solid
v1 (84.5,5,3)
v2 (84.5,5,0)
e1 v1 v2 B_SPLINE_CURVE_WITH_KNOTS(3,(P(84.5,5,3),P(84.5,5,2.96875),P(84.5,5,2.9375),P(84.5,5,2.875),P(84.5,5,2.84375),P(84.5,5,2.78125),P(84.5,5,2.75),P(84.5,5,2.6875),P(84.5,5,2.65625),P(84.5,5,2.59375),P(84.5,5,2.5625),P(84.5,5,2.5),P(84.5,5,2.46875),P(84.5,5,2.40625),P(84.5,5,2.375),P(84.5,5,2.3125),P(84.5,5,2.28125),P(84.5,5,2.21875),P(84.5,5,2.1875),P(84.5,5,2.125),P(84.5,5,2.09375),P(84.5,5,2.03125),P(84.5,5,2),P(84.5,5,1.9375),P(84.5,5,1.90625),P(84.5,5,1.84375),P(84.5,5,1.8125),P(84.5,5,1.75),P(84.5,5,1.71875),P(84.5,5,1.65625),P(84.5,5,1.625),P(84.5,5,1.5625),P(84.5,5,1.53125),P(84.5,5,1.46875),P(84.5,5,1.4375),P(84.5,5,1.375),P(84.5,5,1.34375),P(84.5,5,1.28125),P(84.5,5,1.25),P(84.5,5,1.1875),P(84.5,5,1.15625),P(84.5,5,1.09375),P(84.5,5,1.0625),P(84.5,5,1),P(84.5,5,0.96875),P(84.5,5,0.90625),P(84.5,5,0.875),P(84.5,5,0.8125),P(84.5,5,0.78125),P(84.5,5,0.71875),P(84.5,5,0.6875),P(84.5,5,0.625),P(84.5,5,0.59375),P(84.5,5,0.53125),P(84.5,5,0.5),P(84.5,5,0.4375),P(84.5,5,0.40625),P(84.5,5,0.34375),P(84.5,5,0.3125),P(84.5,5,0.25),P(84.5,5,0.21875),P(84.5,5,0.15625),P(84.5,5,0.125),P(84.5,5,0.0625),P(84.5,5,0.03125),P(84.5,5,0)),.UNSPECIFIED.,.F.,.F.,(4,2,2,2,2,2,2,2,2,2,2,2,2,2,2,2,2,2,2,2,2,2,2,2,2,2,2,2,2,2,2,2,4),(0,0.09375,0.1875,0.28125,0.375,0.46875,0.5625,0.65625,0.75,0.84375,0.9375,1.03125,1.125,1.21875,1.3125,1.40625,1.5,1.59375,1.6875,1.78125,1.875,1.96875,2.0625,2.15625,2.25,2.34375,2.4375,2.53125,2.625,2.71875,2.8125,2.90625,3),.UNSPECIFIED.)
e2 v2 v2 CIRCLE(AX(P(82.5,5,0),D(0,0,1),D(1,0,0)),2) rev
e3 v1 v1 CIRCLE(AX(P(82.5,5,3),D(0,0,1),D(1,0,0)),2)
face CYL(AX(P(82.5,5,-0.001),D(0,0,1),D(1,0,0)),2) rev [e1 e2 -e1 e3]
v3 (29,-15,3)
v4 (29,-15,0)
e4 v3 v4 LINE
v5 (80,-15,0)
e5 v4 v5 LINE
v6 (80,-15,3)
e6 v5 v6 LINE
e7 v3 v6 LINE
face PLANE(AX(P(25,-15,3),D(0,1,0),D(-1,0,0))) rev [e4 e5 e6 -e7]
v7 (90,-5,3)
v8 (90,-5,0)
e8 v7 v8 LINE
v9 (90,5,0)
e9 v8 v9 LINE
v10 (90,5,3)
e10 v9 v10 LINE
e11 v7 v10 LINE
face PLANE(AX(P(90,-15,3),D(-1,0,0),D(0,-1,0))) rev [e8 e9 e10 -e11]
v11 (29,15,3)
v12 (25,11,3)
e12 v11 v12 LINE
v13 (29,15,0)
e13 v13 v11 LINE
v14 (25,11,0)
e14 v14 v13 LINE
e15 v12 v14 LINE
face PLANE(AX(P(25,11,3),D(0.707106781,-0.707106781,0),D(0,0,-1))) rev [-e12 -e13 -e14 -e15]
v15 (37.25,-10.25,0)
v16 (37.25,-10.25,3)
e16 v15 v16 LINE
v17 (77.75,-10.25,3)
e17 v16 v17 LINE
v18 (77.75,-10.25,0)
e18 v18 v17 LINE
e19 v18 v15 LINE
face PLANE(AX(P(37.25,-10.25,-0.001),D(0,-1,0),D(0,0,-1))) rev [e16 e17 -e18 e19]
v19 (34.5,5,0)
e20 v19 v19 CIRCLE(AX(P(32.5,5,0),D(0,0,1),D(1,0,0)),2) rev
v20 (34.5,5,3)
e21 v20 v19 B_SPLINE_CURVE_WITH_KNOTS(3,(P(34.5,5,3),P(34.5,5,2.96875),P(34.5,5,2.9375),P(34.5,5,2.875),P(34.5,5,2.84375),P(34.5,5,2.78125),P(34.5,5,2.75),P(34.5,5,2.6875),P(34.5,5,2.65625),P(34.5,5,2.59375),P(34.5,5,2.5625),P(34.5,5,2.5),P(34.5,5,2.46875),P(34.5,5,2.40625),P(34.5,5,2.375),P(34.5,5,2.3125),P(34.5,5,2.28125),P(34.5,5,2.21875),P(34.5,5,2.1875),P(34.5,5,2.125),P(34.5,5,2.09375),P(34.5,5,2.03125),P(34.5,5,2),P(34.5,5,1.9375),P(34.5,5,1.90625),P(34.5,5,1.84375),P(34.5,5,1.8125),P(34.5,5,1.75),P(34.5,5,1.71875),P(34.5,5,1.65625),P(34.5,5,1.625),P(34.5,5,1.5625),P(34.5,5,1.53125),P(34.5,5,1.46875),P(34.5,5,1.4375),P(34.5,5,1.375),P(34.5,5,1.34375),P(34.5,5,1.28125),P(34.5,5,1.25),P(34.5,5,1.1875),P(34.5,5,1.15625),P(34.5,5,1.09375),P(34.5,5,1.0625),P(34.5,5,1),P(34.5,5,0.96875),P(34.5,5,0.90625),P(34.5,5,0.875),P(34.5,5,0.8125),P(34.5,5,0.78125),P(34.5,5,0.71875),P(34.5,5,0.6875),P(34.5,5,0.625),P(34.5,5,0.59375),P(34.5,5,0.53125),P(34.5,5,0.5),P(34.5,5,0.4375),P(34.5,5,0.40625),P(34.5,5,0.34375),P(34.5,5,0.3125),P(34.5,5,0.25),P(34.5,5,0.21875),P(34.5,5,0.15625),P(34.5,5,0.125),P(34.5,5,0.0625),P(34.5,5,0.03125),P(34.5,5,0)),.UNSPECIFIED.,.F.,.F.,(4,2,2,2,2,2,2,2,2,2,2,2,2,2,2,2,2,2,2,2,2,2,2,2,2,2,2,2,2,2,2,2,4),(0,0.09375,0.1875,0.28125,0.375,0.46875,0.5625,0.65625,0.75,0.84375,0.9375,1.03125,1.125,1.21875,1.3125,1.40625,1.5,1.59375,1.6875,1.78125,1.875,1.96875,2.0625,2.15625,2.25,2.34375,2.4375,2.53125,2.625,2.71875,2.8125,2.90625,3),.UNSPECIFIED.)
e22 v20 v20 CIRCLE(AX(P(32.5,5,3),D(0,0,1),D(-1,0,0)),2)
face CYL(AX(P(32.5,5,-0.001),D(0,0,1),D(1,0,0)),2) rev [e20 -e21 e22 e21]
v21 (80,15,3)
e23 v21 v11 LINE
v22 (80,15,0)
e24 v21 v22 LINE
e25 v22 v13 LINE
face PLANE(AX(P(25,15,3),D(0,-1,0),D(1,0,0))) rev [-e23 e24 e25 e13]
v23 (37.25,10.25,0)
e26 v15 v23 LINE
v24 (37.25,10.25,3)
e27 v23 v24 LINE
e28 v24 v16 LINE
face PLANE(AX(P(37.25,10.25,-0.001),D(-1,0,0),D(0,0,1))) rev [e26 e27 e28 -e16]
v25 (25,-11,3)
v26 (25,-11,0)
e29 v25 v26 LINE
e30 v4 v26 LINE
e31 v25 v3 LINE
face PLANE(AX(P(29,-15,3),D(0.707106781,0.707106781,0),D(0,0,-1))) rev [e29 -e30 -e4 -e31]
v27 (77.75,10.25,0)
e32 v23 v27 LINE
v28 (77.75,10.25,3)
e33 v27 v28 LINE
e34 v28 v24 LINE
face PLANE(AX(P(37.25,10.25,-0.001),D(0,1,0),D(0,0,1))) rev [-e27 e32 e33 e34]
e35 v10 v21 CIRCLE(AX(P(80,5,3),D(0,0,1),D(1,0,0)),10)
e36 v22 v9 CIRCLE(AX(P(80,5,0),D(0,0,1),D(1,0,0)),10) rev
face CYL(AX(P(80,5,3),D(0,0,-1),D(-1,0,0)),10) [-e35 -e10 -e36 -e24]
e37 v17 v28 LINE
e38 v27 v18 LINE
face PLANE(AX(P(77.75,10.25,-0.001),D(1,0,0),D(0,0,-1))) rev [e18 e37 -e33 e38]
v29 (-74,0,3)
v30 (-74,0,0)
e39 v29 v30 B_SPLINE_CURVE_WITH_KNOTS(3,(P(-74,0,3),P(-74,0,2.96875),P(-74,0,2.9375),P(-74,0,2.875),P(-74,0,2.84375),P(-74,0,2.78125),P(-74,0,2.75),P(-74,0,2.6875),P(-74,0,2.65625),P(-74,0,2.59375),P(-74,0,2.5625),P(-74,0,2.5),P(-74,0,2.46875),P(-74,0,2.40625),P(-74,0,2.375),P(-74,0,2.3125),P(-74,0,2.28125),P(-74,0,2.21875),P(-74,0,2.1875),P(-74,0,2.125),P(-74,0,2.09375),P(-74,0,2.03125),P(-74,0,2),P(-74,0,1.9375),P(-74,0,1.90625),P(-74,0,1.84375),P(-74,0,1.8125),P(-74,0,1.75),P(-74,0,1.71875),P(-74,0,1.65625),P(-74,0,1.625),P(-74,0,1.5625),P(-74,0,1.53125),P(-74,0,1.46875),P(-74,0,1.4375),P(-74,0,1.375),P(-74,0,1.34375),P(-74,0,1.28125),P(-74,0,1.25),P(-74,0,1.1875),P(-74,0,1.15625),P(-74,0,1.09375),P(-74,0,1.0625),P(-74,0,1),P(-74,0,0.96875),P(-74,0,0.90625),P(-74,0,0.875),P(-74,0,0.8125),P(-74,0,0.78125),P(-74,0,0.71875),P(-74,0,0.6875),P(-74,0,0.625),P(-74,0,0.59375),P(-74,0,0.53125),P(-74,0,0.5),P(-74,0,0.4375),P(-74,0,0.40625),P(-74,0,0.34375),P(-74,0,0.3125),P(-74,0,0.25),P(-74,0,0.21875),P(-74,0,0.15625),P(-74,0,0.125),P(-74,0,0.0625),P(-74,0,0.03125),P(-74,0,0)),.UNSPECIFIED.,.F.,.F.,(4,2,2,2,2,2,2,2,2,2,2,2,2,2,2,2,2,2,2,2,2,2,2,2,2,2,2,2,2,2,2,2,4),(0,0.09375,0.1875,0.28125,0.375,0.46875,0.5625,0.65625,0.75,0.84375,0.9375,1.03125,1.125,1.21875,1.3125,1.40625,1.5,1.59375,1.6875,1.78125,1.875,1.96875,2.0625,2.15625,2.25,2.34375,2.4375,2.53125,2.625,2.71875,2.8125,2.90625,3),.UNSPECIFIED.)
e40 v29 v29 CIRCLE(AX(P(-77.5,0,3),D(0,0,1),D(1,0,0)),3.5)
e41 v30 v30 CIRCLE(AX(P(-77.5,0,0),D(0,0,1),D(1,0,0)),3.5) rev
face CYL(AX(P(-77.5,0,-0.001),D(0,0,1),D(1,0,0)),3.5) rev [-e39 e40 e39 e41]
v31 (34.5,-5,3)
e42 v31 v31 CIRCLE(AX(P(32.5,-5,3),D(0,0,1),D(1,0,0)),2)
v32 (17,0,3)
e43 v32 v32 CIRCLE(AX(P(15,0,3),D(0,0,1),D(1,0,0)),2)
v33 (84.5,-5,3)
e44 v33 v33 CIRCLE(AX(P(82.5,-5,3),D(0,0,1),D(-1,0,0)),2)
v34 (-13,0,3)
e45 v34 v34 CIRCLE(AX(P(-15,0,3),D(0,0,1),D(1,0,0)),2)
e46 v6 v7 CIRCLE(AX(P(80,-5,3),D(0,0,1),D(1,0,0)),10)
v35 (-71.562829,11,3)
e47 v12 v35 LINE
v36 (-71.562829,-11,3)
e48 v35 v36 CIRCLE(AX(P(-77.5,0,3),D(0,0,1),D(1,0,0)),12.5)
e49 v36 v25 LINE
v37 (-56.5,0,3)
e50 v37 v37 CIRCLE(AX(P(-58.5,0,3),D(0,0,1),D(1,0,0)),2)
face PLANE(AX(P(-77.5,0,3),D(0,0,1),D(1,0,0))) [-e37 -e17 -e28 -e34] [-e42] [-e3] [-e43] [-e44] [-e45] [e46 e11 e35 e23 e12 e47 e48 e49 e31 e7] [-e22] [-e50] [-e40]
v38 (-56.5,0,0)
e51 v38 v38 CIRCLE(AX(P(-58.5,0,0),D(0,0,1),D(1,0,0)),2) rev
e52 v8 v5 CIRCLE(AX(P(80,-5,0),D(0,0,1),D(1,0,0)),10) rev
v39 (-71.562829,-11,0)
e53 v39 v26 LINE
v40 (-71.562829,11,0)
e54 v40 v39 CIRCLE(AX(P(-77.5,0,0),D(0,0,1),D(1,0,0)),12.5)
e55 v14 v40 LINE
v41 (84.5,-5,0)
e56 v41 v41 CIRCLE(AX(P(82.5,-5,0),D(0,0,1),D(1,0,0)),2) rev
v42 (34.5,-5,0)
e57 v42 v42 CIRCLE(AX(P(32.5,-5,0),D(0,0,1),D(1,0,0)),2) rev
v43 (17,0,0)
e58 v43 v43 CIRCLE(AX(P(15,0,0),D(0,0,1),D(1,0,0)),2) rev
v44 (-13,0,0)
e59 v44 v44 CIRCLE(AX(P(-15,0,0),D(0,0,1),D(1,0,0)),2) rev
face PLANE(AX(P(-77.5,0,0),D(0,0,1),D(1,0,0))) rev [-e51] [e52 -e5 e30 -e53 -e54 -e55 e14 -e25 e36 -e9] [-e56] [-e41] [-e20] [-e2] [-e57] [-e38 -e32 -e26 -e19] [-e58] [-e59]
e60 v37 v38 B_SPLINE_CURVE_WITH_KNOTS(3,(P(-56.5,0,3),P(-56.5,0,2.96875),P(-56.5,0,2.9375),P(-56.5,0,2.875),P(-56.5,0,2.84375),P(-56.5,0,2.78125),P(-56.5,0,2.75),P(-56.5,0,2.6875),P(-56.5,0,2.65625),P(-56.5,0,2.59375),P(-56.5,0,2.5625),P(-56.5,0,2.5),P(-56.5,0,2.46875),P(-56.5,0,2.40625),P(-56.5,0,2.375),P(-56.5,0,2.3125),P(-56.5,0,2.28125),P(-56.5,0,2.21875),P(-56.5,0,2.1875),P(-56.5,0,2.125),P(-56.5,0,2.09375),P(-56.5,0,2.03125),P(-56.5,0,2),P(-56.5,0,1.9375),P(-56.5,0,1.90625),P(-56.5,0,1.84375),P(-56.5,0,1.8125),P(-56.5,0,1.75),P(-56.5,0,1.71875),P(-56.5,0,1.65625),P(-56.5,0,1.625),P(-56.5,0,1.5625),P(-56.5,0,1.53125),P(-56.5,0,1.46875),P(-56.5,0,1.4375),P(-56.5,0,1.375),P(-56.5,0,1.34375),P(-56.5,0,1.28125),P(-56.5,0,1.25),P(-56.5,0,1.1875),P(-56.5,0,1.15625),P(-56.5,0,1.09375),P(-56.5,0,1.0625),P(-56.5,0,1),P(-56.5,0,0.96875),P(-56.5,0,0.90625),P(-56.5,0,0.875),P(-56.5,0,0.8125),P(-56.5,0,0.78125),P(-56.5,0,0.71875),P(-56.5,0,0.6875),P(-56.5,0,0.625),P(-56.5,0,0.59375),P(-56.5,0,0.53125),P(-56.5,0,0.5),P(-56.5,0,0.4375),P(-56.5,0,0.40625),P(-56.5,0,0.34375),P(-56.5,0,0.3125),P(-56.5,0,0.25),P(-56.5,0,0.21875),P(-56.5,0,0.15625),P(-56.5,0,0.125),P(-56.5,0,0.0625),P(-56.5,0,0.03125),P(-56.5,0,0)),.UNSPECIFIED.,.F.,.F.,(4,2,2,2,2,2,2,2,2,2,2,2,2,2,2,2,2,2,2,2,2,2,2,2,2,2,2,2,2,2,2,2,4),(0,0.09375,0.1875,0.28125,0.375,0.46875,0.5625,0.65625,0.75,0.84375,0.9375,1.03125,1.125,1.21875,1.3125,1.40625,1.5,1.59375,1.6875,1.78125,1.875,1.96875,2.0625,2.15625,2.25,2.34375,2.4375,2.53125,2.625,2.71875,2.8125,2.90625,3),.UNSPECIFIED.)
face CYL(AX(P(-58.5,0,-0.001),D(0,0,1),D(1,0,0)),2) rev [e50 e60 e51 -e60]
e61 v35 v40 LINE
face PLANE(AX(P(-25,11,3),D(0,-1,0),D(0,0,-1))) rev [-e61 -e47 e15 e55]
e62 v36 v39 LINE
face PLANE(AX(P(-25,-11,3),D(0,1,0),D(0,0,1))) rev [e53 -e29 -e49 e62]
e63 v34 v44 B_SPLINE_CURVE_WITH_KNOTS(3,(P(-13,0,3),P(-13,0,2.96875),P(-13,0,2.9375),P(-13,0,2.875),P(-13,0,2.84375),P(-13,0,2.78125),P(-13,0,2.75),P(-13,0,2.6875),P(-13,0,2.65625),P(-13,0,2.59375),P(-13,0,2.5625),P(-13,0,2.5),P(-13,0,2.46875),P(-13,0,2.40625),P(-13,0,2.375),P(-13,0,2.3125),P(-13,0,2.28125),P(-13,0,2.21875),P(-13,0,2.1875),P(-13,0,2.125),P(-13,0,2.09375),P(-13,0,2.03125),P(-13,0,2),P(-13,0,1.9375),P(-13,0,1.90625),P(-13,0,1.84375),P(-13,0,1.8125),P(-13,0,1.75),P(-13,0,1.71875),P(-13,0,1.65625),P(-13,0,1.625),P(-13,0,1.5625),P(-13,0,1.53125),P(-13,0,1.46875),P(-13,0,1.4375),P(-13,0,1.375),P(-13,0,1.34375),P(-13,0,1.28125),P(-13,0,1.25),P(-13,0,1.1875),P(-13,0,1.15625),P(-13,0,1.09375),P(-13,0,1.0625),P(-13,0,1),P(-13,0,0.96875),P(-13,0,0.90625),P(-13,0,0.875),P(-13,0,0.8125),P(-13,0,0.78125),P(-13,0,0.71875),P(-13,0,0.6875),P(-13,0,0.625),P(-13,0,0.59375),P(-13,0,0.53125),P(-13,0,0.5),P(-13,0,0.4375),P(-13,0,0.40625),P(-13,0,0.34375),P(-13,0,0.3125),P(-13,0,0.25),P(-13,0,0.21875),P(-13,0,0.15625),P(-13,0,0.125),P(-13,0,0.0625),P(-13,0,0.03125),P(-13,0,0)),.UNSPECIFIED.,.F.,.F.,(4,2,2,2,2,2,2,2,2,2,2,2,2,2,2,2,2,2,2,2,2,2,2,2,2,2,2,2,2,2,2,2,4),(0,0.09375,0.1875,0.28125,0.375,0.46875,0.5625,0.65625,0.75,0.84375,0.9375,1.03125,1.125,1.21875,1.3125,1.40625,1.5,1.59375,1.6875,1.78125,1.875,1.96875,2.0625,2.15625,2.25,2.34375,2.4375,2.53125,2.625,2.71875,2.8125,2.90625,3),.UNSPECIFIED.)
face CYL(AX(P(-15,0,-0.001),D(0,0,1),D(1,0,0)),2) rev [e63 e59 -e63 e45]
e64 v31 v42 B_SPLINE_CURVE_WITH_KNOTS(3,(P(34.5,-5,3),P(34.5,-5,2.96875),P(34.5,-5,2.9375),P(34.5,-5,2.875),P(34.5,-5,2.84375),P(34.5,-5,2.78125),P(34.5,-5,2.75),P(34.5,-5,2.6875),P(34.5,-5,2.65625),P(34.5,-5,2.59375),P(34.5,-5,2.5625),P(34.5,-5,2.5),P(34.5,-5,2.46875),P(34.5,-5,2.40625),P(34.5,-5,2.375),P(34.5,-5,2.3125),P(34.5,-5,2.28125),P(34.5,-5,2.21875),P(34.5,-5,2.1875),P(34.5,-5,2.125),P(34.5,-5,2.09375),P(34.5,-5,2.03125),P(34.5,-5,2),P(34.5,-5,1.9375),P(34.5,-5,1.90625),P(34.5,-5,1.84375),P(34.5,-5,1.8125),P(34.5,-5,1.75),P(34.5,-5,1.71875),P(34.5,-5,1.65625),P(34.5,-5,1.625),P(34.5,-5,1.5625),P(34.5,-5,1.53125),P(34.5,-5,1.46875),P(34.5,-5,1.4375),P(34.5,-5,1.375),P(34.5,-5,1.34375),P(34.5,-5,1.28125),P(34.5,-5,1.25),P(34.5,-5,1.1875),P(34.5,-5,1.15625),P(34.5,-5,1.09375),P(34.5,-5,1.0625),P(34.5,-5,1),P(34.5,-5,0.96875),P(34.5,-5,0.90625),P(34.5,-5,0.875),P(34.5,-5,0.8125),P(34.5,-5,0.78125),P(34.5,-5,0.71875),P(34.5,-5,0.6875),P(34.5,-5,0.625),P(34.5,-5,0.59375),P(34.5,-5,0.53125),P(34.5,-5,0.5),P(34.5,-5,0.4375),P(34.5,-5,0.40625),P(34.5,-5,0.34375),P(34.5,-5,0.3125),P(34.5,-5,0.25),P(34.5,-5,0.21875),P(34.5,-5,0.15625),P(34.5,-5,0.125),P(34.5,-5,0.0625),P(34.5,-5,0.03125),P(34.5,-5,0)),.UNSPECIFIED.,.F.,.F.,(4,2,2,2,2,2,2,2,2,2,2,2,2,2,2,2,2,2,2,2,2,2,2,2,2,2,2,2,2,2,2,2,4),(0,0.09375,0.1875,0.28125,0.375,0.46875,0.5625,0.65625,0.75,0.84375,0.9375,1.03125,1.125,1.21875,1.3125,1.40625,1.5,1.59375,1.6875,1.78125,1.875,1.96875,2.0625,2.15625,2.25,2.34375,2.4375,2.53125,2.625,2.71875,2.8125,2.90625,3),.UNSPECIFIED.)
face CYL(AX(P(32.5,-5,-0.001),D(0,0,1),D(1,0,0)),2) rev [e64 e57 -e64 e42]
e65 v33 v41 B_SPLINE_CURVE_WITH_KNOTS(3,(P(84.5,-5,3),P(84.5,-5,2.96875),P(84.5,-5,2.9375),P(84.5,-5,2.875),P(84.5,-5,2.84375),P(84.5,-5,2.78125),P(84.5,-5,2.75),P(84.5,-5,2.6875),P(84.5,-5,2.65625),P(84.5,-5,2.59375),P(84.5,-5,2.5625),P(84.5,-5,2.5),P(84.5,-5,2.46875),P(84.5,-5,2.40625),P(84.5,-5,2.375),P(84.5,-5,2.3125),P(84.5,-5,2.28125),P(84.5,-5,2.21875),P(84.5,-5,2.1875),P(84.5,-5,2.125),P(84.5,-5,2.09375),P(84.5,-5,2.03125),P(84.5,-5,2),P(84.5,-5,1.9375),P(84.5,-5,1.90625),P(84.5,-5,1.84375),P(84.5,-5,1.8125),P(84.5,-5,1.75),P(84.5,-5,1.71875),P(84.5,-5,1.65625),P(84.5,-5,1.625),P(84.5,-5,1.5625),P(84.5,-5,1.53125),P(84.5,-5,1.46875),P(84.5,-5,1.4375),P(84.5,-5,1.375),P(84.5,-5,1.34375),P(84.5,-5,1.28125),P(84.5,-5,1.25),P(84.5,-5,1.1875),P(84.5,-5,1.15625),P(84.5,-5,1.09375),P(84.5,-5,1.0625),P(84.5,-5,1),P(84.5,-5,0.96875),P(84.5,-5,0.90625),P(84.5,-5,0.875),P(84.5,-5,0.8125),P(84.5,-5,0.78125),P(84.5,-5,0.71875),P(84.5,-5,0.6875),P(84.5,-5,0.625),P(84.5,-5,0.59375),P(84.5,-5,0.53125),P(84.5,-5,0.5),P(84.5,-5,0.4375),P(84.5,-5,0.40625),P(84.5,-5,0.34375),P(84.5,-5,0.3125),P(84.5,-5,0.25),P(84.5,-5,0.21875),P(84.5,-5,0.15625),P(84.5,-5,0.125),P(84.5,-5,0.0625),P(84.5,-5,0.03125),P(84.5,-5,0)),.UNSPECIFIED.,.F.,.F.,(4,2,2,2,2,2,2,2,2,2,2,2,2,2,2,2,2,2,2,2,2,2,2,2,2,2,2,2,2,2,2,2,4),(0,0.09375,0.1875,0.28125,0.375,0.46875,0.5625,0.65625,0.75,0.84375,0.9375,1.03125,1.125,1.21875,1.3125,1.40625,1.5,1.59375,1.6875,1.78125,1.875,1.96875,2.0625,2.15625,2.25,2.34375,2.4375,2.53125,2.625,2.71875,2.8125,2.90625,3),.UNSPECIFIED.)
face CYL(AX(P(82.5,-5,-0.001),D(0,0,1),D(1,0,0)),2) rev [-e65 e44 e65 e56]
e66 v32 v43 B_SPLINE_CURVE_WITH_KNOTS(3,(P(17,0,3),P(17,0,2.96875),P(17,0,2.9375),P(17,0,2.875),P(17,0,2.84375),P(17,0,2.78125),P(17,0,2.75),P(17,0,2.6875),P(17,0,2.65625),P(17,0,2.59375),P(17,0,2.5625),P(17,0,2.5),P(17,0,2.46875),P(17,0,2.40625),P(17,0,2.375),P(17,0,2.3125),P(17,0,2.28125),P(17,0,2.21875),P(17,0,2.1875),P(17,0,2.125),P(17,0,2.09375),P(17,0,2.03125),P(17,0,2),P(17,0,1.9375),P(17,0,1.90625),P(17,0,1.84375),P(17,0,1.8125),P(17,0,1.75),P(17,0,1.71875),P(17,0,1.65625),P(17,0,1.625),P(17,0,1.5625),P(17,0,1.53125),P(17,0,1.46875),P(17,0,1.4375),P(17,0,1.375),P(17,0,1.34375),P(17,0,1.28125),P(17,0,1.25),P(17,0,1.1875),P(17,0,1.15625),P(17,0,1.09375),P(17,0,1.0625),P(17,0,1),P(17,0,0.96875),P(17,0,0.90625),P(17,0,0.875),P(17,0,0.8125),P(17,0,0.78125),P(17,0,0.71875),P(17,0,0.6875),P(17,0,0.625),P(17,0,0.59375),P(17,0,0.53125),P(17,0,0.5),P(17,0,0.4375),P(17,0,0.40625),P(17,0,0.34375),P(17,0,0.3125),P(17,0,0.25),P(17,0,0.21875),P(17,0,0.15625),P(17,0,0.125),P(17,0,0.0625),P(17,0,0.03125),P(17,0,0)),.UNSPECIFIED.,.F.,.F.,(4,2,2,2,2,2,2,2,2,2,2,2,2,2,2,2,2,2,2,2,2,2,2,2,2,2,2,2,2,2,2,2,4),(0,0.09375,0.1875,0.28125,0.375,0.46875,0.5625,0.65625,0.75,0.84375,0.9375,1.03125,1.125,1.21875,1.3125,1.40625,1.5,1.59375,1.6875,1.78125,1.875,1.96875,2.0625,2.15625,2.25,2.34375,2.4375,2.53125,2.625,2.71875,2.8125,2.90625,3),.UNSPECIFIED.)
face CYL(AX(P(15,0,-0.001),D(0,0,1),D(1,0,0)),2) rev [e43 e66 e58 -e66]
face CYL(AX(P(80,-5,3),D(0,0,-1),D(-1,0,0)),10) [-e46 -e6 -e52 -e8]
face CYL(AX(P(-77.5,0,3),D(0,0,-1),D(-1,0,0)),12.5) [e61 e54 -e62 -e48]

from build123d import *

# Parameters (mm, degrees)
SALIENTE_EXTRUIR1_DEPTH = 3
REDONDEO1_R             = 10
CHAFL_N1_SIZE           = 4
CORTAR_EXTRUIR1_REACH   = 93.291
CROQUIS2_R              = 2
CROQUIS2_W              = 40.5
CROQUIS2_H              = 20.5
CORTAR_EXTRUIR2_REACH   = 93.291
CROQUIS3_R              = 3.5
CROQUIS3_R_2            = 2
CORTAR_EXTRUIR3_REACH   = 93.291
CROQUIS4_R              = 2


with BuildPart() as part:
    # Croquis1 → Saliente-Extruir1 (new body)
    with BuildSketch(Plane.XY):
        with BuildLine():
            Line((90, -15), (90, 15))
            Line((90, 15), (25, 15))
            Line((25, 15), (25, 11))
            Line((25, 11), (-25, 11))
            Line((-25, 11), (-71.562828956, 11))
            ThreePointArc((-71.562828956, 11), (-90, 0), (-71.562828956, -11))
            Line((-71.562828956, -11), (-25, -11))
            Line((-25, -11), (25, -11))
            Line((25, -11), (25, -15))
            Line((25, -15), (90, -15))
        make_face()
    extrude(amount=SALIENTE_EXTRUIR1_DEPTH)

    # Redondeo1
    redondeo1_edges = [part.edges().sort_by_distance(p)[0] for p in [
        (90, 15, 1.5),
        (90, -15, 1.5),
    ]]
    fillet(redondeo1_edges, radius=REDONDEO1_R)

    # Chaflán1
    chafl_n1_edges = [part.edges().sort_by_distance(p)[0] for p in [
        (25, -15, 1.5),
        (25, 15, 1.5),
    ]]
    chamfer(chafl_n1_edges, length=CHAFL_N1_SIZE - 0.0001)  # a hair under: the kernel refuses the full size

    # Croquis2 → Cortar-Extruir1 (cut, up to next)
    with BuildSketch(Plane.XY.offset(3), mode=Mode.PRIVATE) as cortar_extruir1_sk1:
        with Locations((82.5, 5)):
            Circle(CROQUIS2_R)
    cortar_extruir1_tool1 = extrude(cortar_extruir1_sk1.sketch, amount=-CORTAR_EXTRUIR1_REACH, mode=Mode.PRIVATE) & part.part
    # Croquis2 → Cortar-Extruir1 (cut, up to next)
    with BuildSketch(Plane.XY.offset(3), mode=Mode.PRIVATE) as cortar_extruir1_sk2:
        with Locations((32.5, 5)):
            Circle(CROQUIS2_R)
    cortar_extruir1_tool2 = extrude(cortar_extruir1_sk2.sketch, amount=-CORTAR_EXTRUIR1_REACH, mode=Mode.PRIVATE) & part.part
    # Croquis2 → Cortar-Extruir1 (cut, up to next)
    with BuildSketch(Plane.XY.offset(3), mode=Mode.PRIVATE) as cortar_extruir1_sk3:
        with Locations((82.5, -5)):
            Circle(CROQUIS2_R)
    cortar_extruir1_tool3 = extrude(cortar_extruir1_sk3.sketch, amount=-CORTAR_EXTRUIR1_REACH, mode=Mode.PRIVATE) & part.part
    # Croquis2 → Cortar-Extruir1 (cut, up to next)
    with BuildSketch(Plane.XY.offset(3), mode=Mode.PRIVATE) as cortar_extruir1_sk4:
        with Locations((32.5, -5)):
            Circle(CROQUIS2_R)
    cortar_extruir1_tool4 = extrude(cortar_extruir1_sk4.sketch, amount=-CORTAR_EXTRUIR1_REACH, mode=Mode.PRIVATE) & part.part
    # Croquis2 → Cortar-Extruir1 (cut, up to next)
    with BuildSketch(Plane.XY.offset(3), mode=Mode.PRIVATE) as cortar_extruir1_sk5:
        with Locations((57.5, 0)):
            Rectangle(CROQUIS2_W, CROQUIS2_H)
    cortar_extruir1_tool5 = extrude(cortar_extruir1_sk5.sketch, amount=-CORTAR_EXTRUIR1_REACH, mode=Mode.PRIVATE) & part.part
    add(cortar_extruir1_tool1.solids().sort_by_distance((82.5, 5, 3))[0], mode=Mode.SUBTRACT)
    add(cortar_extruir1_tool2.solids().sort_by_distance((32.5, 5, 3))[0], mode=Mode.SUBTRACT)
    add(cortar_extruir1_tool3.solids().sort_by_distance((82.5, -5, 3))[0], mode=Mode.SUBTRACT)
    add(cortar_extruir1_tool4.solids().sort_by_distance((32.5, -5, 3))[0], mode=Mode.SUBTRACT)
    add(cortar_extruir1_tool5.solids().sort_by_distance((57.5, 0, 3))[0], mode=Mode.SUBTRACT)

    # Croquis3 → Cortar-Extruir2 (cut, up to next)
    with BuildSketch(Plane.XY.offset(3), mode=Mode.PRIVATE) as cortar_extruir2_sk1:
        with Locations((-77.5, 0)):
            Circle(CROQUIS3_R)
    cortar_extruir2_tool1 = extrude(cortar_extruir2_sk1.sketch, amount=-CORTAR_EXTRUIR2_REACH, mode=Mode.PRIVATE) & part.part
    # Croquis3 → Cortar-Extruir2 (cut, up to next)
    with BuildSketch(Plane.XY.offset(3), mode=Mode.PRIVATE) as cortar_extruir2_sk2:
        with Locations((-58.5, 0)):
            Circle(CROQUIS3_R_2)
    cortar_extruir2_tool2 = extrude(cortar_extruir2_sk2.sketch, amount=-CORTAR_EXTRUIR2_REACH, mode=Mode.PRIVATE) & part.part
    add(cortar_extruir2_tool1.solids().sort_by_distance((-77.5, 0, 3))[0], mode=Mode.SUBTRACT)
    add(cortar_extruir2_tool2.solids().sort_by_distance((-58.5, 0, 3))[0], mode=Mode.SUBTRACT)

    # Croquis4 → Cortar-Extruir3 (cut, up to next)
    with BuildSketch(Plane.XY.offset(3), mode=Mode.PRIVATE) as cortar_extruir3_sk1:
        with Locations((-15, 0)):
            Circle(CROQUIS4_R)
    cortar_extruir3_tool1 = extrude(cortar_extruir3_sk1.sketch, amount=-CORTAR_EXTRUIR3_REACH, mode=Mode.PRIVATE) & part.part
    # Croquis4 → Cortar-Extruir3 (cut, up to next)
    with BuildSketch(Plane.XY.offset(3), mode=Mode.PRIVATE) as cortar_extruir3_sk2:
        with Locations((15, 0)):
            Circle(CROQUIS4_R)
    cortar_extruir3_tool2 = extrude(cortar_extruir3_sk2.sketch, amount=-CORTAR_EXTRUIR3_REACH, mode=Mode.PRIVATE) & part.part
    add(cortar_extruir3_tool1.solids().sort_by_distance((-15, 0, 3))[0], mode=Mode.SUBTRACT)
    add(cortar_extruir3_tool2.solids().sort_by_distance((15, 0, 3))[0], mode=Mode.SUBTRACT)


solid = part.part
